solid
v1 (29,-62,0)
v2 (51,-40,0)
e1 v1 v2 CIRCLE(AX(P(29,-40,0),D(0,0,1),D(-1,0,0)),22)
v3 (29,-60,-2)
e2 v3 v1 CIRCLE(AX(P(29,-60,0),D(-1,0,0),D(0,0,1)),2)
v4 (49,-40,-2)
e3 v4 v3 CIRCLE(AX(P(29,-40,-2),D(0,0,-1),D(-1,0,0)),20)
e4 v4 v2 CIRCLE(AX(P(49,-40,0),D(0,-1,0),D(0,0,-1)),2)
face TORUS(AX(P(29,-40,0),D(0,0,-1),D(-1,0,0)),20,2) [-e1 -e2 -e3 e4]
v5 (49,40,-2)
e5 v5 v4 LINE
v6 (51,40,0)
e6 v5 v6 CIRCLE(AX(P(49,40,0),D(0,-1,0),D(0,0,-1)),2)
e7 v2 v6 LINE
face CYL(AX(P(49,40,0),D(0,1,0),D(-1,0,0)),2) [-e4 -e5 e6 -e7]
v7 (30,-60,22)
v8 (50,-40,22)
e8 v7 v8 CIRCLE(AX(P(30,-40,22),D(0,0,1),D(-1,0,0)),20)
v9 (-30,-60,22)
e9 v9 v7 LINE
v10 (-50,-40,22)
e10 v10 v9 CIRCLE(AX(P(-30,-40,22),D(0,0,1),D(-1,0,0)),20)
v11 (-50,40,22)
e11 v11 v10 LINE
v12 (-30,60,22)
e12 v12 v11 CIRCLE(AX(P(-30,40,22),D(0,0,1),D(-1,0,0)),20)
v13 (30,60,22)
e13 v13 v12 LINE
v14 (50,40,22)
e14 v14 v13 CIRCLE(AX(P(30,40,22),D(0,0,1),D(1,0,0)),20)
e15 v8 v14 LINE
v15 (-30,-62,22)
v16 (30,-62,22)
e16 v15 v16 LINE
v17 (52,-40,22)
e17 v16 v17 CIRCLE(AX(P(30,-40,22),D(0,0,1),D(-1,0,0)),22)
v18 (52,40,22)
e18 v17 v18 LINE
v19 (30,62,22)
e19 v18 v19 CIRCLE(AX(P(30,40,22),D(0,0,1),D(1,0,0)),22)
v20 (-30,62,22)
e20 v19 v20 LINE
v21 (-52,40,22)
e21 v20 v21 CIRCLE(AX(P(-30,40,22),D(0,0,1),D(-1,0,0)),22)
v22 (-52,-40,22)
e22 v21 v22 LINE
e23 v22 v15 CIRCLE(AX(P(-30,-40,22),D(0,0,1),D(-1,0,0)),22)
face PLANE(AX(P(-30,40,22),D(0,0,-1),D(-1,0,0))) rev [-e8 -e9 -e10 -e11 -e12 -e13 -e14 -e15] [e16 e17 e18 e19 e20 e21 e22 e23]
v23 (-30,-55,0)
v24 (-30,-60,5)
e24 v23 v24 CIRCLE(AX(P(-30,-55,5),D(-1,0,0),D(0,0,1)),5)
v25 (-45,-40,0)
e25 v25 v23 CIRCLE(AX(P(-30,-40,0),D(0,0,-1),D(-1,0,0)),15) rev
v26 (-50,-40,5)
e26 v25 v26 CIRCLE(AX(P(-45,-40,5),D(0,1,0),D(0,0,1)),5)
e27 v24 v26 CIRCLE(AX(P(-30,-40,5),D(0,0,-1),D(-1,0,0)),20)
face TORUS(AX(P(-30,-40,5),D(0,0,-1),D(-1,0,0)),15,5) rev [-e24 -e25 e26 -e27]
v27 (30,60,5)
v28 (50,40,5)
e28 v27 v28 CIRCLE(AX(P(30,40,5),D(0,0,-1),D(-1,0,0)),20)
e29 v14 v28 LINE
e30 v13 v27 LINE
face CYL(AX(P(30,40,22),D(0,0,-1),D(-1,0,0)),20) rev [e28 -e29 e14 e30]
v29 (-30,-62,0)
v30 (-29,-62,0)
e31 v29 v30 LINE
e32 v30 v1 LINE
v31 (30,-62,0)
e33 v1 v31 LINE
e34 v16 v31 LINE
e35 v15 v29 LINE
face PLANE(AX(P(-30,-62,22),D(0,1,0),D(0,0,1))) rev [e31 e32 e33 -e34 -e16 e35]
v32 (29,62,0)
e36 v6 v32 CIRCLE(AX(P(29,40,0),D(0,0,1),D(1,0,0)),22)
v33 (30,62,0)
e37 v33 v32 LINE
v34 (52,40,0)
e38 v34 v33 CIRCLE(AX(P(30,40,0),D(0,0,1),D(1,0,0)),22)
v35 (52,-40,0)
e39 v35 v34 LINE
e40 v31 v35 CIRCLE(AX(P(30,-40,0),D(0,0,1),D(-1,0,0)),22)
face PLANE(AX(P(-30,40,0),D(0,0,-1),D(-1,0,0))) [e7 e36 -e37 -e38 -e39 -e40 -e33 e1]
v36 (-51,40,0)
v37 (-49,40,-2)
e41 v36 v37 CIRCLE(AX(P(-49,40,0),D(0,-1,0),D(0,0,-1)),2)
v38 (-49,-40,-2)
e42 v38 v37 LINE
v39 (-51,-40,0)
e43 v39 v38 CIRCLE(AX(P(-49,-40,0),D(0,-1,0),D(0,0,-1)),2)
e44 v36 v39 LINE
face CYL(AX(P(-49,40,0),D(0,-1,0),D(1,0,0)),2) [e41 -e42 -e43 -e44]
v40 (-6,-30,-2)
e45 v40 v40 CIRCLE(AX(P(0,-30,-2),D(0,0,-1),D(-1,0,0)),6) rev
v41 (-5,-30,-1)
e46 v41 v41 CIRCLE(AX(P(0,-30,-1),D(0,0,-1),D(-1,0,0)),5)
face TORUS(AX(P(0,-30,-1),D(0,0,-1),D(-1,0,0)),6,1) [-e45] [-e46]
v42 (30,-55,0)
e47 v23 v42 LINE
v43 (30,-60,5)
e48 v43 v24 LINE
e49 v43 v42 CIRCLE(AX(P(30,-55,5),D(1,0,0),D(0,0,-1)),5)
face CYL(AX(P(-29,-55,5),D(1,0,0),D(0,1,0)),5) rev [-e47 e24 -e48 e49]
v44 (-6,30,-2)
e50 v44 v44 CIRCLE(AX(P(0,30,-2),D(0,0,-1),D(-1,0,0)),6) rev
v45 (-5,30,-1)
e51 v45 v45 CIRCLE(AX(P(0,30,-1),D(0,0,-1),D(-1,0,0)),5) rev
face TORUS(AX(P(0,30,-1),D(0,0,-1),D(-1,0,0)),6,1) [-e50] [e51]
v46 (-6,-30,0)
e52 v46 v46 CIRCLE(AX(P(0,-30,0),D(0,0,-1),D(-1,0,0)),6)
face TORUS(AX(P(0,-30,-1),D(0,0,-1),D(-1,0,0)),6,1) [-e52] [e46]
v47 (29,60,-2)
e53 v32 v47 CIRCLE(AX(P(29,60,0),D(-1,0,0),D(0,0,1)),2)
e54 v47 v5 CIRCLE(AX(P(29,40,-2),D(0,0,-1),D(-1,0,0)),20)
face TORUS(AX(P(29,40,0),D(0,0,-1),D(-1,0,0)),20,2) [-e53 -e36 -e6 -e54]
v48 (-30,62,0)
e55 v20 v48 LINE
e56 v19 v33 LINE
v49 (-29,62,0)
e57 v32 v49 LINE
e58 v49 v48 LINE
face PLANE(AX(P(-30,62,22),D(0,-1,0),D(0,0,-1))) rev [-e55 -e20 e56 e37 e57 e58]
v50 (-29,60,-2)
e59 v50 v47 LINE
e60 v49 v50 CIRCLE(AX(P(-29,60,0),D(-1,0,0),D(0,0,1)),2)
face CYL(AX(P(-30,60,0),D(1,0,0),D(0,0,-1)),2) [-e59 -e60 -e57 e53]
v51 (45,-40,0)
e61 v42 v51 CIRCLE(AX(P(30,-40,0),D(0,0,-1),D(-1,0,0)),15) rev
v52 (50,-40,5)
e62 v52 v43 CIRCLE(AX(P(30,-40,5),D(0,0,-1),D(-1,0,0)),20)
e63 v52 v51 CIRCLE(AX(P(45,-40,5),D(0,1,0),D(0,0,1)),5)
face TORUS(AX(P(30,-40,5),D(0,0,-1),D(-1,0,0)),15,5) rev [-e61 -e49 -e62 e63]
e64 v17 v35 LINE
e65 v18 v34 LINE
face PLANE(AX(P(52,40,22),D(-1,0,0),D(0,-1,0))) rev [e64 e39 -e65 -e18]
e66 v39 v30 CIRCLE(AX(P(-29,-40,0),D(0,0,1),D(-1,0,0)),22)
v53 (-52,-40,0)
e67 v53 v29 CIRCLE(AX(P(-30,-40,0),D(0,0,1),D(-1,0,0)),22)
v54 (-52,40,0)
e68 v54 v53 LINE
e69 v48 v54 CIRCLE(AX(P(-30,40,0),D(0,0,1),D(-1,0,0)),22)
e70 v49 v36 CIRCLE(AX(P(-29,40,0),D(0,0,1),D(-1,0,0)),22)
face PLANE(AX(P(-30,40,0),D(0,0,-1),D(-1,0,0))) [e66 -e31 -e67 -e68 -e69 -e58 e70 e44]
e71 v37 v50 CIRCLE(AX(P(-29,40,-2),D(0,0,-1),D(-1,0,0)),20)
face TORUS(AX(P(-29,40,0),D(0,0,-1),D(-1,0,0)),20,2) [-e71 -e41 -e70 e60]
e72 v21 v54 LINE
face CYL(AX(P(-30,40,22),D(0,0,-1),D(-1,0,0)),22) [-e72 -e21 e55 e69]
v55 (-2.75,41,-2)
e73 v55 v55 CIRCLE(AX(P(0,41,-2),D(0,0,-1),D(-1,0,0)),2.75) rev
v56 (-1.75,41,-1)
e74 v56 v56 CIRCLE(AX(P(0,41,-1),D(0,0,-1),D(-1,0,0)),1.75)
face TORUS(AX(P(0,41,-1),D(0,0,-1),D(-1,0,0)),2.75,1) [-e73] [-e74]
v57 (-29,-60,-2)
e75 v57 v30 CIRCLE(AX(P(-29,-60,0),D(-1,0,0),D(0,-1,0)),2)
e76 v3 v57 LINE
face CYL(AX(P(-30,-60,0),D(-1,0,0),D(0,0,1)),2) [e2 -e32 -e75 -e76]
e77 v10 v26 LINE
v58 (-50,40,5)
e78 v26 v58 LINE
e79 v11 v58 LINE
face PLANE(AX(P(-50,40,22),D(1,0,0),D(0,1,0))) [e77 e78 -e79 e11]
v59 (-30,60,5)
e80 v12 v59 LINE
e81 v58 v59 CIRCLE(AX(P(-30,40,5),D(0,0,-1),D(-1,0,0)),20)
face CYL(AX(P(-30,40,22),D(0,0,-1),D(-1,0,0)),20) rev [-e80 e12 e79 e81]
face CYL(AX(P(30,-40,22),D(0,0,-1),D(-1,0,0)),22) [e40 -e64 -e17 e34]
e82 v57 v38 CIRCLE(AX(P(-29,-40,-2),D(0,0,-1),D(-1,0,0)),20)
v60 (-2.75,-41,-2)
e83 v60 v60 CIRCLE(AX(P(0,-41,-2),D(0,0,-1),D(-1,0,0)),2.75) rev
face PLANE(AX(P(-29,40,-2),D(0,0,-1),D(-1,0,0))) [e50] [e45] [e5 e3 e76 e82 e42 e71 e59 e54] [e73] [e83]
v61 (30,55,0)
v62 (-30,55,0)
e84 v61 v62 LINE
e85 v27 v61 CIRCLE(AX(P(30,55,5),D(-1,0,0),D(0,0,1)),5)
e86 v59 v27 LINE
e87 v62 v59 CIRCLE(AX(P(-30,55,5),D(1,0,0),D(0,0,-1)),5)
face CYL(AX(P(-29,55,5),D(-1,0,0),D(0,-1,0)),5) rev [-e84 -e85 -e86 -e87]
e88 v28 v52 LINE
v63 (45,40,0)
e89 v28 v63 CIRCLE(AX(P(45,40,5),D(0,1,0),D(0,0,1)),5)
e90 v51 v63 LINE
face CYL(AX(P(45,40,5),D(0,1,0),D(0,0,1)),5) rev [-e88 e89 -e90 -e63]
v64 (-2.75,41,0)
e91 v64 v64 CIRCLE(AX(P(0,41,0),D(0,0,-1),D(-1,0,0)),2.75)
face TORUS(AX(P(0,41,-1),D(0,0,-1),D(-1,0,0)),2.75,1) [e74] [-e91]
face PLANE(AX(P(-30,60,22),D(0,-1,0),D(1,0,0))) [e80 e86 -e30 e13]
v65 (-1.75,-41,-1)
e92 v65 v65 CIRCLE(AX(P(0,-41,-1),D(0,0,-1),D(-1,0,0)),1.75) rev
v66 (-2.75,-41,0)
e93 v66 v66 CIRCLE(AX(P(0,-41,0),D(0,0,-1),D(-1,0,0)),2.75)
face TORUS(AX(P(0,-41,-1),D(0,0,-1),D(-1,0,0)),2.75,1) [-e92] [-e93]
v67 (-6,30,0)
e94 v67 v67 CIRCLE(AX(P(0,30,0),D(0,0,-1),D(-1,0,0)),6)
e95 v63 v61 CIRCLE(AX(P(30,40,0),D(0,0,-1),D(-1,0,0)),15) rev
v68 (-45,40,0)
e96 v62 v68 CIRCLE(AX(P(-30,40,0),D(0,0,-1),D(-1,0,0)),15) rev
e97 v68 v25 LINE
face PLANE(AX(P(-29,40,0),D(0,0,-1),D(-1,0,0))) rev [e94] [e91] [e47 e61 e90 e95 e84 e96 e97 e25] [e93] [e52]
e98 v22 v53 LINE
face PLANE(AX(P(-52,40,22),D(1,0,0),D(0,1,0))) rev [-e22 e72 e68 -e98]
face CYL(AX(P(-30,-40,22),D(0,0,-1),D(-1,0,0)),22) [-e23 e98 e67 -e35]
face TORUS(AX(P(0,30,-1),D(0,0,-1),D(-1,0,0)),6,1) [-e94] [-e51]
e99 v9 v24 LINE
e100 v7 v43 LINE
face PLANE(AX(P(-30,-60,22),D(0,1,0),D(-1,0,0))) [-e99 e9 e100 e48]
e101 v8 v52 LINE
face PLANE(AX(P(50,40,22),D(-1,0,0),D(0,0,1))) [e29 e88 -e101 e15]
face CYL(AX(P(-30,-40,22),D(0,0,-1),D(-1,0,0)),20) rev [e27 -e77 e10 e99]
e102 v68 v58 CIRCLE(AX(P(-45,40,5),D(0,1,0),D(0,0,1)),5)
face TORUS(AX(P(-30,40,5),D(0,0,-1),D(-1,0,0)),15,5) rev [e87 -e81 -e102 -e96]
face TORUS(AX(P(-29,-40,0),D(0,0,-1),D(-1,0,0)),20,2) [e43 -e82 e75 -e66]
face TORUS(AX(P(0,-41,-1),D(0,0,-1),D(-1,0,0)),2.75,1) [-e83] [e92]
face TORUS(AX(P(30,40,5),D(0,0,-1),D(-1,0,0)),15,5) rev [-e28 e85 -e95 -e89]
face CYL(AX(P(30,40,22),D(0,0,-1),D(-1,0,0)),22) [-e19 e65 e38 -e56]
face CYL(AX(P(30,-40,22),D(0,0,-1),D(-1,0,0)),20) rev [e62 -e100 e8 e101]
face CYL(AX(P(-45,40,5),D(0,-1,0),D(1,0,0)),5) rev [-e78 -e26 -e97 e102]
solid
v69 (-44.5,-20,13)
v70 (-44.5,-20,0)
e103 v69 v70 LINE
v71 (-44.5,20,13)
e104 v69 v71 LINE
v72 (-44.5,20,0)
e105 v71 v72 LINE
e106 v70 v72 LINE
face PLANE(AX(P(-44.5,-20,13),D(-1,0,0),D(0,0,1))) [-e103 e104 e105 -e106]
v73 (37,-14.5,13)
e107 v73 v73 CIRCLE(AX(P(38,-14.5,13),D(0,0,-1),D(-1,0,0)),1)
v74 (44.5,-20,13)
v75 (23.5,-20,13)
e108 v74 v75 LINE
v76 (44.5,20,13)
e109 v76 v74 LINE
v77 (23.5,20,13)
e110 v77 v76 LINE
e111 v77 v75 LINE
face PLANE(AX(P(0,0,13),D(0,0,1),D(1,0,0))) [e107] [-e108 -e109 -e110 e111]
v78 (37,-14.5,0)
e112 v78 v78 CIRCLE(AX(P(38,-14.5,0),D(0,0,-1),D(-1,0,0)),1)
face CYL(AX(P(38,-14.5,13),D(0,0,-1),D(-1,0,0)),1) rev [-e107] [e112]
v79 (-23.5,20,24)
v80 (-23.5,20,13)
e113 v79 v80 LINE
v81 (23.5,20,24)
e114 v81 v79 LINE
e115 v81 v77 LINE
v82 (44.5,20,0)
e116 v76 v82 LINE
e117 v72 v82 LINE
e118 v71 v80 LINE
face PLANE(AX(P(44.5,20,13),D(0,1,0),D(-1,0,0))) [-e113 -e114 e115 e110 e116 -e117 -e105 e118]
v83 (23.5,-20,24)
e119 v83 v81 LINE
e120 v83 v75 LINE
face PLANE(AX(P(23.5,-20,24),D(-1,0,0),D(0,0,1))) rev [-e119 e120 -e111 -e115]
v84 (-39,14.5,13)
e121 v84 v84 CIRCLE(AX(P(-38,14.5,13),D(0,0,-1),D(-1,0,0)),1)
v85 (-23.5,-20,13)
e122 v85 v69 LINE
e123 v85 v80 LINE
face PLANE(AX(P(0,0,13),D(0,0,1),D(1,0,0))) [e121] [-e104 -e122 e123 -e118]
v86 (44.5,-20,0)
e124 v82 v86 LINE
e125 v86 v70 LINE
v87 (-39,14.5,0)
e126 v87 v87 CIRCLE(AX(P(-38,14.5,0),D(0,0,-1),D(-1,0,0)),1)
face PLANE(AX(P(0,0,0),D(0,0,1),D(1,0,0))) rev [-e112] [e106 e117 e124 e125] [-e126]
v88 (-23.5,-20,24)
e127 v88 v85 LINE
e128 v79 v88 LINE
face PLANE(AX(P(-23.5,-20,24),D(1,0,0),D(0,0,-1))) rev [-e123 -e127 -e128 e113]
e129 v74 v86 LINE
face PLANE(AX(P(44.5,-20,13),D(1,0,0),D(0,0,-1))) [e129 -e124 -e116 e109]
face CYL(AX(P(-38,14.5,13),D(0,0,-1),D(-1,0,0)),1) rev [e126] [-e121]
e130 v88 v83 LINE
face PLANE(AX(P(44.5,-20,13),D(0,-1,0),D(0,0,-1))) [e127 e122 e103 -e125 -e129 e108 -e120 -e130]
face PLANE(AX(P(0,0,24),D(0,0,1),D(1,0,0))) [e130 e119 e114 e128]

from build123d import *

# Parameters (mm, degrees)
BOSS_EXTRUDE1_DEPTH = 22
SKETCH3_W           = 47
SKETCH3_H           = 40
BOSS_EXTRUDE2_DEPTH = 24
SKETCH7_W           = 89
SKETCH7_H           = 40
SKETCH7_R           = 1
BOSS_EXTRUDE4_DEPTH = 13
SKETCH6_R           = 1.75
SKETCH6_R_2         = 5
BOSS_EXTRUDE3_DEPTH = 2
FILLET10_R          = 5
FILLET12_R          = 2
FILLET13_R          = 1
FILLET14_R          = 1


with BuildPart() as part:
    # Sketch1 → Boss-Extrude1 (new body)
    with BuildSketch(Plane.XY):
        with BuildLine():
            Line((-30, 62), (30, 62))
            ThreePointArc((30, 62), (45.556349186, 55.556349186), (52, 40))
            Line((52, 40), (52, -40))
            ThreePointArc((52, -40), (45.556349186, -55.556349186), (30, -62))
            Line((30, -62), (-30, -62))
            ThreePointArc((-30, -62), (-45.556349186, -55.556349186), (-52, -40))
            Line((-52, -40), (-52, 40))
            ThreePointArc((-52, 40), (-45.556349186, 55.556349186), (-30, 62))
        make_face()
        with BuildLine():
            Line((-30, 60), (30, 60))
            ThreePointArc((30, 60), (44.142135624, 54.142135624), (50, 40))
            Line((50, 40), (50, -40))
            ThreePointArc((50, -40), (44.142135624, -54.142135624), (30, -60))
            Line((30, -60), (-30, -60))
            ThreePointArc((-30, -60), (-44.142135624, -54.142135624), (-50, -40))
            Line((-50, -40), (-50, 40))
            ThreePointArc((-50, 40), (-44.142135624, 54.142135624), (-30, 60))
        make_face(mode=Mode.SUBTRACT)
    extrude(amount=BOSS_EXTRUDE1_DEPTH)


with BuildPart() as body_2:
    # Sketch3 → Boss-Extrude2 (new body)
    with BuildSketch(Plane.XY):
        Rectangle(SKETCH3_W, SKETCH3_H)
    extrude(amount=BOSS_EXTRUDE2_DEPTH)


with BuildPart() as body_3:
    # Sketch7 → Boss-Extrude4 (new body)
    with BuildSketch(Plane(origin=(0, 0, 0), x_dir=(-1, 0, 0), z_dir=(0, 0, -1))):
        Rectangle(SKETCH7_W, SKETCH7_H)
        with Locations((-38, -14.5)):
            Circle(SKETCH7_R, mode=Mode.SUBTRACT)
        with Locations((38, 14.5)):
            Circle(SKETCH7_R, mode=Mode.SUBTRACT)
    extrude(amount=-BOSS_EXTRUDE4_DEPTH)

    # Combine2: union body 2
    add(body_2.part)


with BuildPart() as body_4:
    # Sketch6 → Boss-Extrude3 (new body)
    with BuildSketch(Plane.XY):
        with BuildLine():
            Line((-29, 62), (29, 62))
            ThreePointArc((29, 62), (44.556349186, 55.556349186), (51, 40))
            Line((51, 40), (51, -40))
            ThreePointArc((51, -40), (44.556349186, -55.556349186), (29, -62))
            Line((29, -62), (-29, -62))
            ThreePointArc((-29, -62), (-44.556349186, -55.556349186), (-51, -40))
            Line((-51, -40), (-51, 40))
            ThreePointArc((-51, 40), (-44.556349186, 55.556349186), (-29, 62))
        make_face()
        with Locations((0, 41)):
            Circle(SKETCH6_R, mode=Mode.SUBTRACT)
        with Locations((0, -41)):
            Circle(SKETCH6_R, mode=Mode.SUBTRACT)
        with Locations((0, 30)):
            Circle(SKETCH6_R_2, mode=Mode.SUBTRACT)
        with Locations((0, -30)):
            Circle(SKETCH6_R_2, mode=Mode.SUBTRACT)
    extrude(amount=-BOSS_EXTRUDE3_DEPTH)


with BuildPart() as part_1:
    add(part.part)

    # Combine1: union body 4
    add(body_4.part)

    # Fillet10
    fillet10_edges = [part_1.edges().sort_by_distance(p)[0] for p in [
        (44.142135624, 54.142135624, 0),
        (0, 60, 0),
        (-44.142135624, 54.142135624, 0),
        (-50, 0, 0),
        (-44.142135624, -54.142135624, 0),
        (0, -60, 0),
        (44.142135624, -54.142135624, 0),
        (50, 0, 0),
    ]]
    fillet(fillet10_edges, radius=FILLET10_R)

    # Fillet12
    fillet12_edges = [part_1.edges().sort_by_distance(p)[0] for p in [
        (-44.556349186, -55.556349186, -2),
        (0, -62, -2),
        (44.556349186, -55.556349186, -2),
        (51, 0, -2),
        (44.556349186, 55.556349186, -2),
        (0, 62, -2),
        (-51, 0, -2),
        (-44.556349186, 55.556349186, -2),
    ]]
    fillet(fillet12_edges, radius=FILLET12_R - 0.0001)  # a hair under: the kernel refuses the full size

    # Fillet13
    fillet13_edges = [part_1.edges().sort_by_distance(p)[0] for p in [
        (-5, 30, -2),
        (-5, 30, 0),
    ]]
    fillet(fillet13_edges, radius=FILLET13_R - 0.0001)  # a hair under: the kernel refuses the full size

    # Fillet14
    fillet14_edges = [part_1.edges().sort_by_distance(p)[0] for p in [
        (-5, -30, -2),
        (-1.75, -41, -2),
        (-1.75, 41, -2),
        (-1.75, 41, 0),
        (-1.75, -41, 0),
        (-5, -30, 0),
    ]]
    fillet(fillet14_edges, radius=FILLET14_R - 0.0001)  # a hair under: the kernel refuses the full size


solid = Compound([body_3.part, part_1.part])
